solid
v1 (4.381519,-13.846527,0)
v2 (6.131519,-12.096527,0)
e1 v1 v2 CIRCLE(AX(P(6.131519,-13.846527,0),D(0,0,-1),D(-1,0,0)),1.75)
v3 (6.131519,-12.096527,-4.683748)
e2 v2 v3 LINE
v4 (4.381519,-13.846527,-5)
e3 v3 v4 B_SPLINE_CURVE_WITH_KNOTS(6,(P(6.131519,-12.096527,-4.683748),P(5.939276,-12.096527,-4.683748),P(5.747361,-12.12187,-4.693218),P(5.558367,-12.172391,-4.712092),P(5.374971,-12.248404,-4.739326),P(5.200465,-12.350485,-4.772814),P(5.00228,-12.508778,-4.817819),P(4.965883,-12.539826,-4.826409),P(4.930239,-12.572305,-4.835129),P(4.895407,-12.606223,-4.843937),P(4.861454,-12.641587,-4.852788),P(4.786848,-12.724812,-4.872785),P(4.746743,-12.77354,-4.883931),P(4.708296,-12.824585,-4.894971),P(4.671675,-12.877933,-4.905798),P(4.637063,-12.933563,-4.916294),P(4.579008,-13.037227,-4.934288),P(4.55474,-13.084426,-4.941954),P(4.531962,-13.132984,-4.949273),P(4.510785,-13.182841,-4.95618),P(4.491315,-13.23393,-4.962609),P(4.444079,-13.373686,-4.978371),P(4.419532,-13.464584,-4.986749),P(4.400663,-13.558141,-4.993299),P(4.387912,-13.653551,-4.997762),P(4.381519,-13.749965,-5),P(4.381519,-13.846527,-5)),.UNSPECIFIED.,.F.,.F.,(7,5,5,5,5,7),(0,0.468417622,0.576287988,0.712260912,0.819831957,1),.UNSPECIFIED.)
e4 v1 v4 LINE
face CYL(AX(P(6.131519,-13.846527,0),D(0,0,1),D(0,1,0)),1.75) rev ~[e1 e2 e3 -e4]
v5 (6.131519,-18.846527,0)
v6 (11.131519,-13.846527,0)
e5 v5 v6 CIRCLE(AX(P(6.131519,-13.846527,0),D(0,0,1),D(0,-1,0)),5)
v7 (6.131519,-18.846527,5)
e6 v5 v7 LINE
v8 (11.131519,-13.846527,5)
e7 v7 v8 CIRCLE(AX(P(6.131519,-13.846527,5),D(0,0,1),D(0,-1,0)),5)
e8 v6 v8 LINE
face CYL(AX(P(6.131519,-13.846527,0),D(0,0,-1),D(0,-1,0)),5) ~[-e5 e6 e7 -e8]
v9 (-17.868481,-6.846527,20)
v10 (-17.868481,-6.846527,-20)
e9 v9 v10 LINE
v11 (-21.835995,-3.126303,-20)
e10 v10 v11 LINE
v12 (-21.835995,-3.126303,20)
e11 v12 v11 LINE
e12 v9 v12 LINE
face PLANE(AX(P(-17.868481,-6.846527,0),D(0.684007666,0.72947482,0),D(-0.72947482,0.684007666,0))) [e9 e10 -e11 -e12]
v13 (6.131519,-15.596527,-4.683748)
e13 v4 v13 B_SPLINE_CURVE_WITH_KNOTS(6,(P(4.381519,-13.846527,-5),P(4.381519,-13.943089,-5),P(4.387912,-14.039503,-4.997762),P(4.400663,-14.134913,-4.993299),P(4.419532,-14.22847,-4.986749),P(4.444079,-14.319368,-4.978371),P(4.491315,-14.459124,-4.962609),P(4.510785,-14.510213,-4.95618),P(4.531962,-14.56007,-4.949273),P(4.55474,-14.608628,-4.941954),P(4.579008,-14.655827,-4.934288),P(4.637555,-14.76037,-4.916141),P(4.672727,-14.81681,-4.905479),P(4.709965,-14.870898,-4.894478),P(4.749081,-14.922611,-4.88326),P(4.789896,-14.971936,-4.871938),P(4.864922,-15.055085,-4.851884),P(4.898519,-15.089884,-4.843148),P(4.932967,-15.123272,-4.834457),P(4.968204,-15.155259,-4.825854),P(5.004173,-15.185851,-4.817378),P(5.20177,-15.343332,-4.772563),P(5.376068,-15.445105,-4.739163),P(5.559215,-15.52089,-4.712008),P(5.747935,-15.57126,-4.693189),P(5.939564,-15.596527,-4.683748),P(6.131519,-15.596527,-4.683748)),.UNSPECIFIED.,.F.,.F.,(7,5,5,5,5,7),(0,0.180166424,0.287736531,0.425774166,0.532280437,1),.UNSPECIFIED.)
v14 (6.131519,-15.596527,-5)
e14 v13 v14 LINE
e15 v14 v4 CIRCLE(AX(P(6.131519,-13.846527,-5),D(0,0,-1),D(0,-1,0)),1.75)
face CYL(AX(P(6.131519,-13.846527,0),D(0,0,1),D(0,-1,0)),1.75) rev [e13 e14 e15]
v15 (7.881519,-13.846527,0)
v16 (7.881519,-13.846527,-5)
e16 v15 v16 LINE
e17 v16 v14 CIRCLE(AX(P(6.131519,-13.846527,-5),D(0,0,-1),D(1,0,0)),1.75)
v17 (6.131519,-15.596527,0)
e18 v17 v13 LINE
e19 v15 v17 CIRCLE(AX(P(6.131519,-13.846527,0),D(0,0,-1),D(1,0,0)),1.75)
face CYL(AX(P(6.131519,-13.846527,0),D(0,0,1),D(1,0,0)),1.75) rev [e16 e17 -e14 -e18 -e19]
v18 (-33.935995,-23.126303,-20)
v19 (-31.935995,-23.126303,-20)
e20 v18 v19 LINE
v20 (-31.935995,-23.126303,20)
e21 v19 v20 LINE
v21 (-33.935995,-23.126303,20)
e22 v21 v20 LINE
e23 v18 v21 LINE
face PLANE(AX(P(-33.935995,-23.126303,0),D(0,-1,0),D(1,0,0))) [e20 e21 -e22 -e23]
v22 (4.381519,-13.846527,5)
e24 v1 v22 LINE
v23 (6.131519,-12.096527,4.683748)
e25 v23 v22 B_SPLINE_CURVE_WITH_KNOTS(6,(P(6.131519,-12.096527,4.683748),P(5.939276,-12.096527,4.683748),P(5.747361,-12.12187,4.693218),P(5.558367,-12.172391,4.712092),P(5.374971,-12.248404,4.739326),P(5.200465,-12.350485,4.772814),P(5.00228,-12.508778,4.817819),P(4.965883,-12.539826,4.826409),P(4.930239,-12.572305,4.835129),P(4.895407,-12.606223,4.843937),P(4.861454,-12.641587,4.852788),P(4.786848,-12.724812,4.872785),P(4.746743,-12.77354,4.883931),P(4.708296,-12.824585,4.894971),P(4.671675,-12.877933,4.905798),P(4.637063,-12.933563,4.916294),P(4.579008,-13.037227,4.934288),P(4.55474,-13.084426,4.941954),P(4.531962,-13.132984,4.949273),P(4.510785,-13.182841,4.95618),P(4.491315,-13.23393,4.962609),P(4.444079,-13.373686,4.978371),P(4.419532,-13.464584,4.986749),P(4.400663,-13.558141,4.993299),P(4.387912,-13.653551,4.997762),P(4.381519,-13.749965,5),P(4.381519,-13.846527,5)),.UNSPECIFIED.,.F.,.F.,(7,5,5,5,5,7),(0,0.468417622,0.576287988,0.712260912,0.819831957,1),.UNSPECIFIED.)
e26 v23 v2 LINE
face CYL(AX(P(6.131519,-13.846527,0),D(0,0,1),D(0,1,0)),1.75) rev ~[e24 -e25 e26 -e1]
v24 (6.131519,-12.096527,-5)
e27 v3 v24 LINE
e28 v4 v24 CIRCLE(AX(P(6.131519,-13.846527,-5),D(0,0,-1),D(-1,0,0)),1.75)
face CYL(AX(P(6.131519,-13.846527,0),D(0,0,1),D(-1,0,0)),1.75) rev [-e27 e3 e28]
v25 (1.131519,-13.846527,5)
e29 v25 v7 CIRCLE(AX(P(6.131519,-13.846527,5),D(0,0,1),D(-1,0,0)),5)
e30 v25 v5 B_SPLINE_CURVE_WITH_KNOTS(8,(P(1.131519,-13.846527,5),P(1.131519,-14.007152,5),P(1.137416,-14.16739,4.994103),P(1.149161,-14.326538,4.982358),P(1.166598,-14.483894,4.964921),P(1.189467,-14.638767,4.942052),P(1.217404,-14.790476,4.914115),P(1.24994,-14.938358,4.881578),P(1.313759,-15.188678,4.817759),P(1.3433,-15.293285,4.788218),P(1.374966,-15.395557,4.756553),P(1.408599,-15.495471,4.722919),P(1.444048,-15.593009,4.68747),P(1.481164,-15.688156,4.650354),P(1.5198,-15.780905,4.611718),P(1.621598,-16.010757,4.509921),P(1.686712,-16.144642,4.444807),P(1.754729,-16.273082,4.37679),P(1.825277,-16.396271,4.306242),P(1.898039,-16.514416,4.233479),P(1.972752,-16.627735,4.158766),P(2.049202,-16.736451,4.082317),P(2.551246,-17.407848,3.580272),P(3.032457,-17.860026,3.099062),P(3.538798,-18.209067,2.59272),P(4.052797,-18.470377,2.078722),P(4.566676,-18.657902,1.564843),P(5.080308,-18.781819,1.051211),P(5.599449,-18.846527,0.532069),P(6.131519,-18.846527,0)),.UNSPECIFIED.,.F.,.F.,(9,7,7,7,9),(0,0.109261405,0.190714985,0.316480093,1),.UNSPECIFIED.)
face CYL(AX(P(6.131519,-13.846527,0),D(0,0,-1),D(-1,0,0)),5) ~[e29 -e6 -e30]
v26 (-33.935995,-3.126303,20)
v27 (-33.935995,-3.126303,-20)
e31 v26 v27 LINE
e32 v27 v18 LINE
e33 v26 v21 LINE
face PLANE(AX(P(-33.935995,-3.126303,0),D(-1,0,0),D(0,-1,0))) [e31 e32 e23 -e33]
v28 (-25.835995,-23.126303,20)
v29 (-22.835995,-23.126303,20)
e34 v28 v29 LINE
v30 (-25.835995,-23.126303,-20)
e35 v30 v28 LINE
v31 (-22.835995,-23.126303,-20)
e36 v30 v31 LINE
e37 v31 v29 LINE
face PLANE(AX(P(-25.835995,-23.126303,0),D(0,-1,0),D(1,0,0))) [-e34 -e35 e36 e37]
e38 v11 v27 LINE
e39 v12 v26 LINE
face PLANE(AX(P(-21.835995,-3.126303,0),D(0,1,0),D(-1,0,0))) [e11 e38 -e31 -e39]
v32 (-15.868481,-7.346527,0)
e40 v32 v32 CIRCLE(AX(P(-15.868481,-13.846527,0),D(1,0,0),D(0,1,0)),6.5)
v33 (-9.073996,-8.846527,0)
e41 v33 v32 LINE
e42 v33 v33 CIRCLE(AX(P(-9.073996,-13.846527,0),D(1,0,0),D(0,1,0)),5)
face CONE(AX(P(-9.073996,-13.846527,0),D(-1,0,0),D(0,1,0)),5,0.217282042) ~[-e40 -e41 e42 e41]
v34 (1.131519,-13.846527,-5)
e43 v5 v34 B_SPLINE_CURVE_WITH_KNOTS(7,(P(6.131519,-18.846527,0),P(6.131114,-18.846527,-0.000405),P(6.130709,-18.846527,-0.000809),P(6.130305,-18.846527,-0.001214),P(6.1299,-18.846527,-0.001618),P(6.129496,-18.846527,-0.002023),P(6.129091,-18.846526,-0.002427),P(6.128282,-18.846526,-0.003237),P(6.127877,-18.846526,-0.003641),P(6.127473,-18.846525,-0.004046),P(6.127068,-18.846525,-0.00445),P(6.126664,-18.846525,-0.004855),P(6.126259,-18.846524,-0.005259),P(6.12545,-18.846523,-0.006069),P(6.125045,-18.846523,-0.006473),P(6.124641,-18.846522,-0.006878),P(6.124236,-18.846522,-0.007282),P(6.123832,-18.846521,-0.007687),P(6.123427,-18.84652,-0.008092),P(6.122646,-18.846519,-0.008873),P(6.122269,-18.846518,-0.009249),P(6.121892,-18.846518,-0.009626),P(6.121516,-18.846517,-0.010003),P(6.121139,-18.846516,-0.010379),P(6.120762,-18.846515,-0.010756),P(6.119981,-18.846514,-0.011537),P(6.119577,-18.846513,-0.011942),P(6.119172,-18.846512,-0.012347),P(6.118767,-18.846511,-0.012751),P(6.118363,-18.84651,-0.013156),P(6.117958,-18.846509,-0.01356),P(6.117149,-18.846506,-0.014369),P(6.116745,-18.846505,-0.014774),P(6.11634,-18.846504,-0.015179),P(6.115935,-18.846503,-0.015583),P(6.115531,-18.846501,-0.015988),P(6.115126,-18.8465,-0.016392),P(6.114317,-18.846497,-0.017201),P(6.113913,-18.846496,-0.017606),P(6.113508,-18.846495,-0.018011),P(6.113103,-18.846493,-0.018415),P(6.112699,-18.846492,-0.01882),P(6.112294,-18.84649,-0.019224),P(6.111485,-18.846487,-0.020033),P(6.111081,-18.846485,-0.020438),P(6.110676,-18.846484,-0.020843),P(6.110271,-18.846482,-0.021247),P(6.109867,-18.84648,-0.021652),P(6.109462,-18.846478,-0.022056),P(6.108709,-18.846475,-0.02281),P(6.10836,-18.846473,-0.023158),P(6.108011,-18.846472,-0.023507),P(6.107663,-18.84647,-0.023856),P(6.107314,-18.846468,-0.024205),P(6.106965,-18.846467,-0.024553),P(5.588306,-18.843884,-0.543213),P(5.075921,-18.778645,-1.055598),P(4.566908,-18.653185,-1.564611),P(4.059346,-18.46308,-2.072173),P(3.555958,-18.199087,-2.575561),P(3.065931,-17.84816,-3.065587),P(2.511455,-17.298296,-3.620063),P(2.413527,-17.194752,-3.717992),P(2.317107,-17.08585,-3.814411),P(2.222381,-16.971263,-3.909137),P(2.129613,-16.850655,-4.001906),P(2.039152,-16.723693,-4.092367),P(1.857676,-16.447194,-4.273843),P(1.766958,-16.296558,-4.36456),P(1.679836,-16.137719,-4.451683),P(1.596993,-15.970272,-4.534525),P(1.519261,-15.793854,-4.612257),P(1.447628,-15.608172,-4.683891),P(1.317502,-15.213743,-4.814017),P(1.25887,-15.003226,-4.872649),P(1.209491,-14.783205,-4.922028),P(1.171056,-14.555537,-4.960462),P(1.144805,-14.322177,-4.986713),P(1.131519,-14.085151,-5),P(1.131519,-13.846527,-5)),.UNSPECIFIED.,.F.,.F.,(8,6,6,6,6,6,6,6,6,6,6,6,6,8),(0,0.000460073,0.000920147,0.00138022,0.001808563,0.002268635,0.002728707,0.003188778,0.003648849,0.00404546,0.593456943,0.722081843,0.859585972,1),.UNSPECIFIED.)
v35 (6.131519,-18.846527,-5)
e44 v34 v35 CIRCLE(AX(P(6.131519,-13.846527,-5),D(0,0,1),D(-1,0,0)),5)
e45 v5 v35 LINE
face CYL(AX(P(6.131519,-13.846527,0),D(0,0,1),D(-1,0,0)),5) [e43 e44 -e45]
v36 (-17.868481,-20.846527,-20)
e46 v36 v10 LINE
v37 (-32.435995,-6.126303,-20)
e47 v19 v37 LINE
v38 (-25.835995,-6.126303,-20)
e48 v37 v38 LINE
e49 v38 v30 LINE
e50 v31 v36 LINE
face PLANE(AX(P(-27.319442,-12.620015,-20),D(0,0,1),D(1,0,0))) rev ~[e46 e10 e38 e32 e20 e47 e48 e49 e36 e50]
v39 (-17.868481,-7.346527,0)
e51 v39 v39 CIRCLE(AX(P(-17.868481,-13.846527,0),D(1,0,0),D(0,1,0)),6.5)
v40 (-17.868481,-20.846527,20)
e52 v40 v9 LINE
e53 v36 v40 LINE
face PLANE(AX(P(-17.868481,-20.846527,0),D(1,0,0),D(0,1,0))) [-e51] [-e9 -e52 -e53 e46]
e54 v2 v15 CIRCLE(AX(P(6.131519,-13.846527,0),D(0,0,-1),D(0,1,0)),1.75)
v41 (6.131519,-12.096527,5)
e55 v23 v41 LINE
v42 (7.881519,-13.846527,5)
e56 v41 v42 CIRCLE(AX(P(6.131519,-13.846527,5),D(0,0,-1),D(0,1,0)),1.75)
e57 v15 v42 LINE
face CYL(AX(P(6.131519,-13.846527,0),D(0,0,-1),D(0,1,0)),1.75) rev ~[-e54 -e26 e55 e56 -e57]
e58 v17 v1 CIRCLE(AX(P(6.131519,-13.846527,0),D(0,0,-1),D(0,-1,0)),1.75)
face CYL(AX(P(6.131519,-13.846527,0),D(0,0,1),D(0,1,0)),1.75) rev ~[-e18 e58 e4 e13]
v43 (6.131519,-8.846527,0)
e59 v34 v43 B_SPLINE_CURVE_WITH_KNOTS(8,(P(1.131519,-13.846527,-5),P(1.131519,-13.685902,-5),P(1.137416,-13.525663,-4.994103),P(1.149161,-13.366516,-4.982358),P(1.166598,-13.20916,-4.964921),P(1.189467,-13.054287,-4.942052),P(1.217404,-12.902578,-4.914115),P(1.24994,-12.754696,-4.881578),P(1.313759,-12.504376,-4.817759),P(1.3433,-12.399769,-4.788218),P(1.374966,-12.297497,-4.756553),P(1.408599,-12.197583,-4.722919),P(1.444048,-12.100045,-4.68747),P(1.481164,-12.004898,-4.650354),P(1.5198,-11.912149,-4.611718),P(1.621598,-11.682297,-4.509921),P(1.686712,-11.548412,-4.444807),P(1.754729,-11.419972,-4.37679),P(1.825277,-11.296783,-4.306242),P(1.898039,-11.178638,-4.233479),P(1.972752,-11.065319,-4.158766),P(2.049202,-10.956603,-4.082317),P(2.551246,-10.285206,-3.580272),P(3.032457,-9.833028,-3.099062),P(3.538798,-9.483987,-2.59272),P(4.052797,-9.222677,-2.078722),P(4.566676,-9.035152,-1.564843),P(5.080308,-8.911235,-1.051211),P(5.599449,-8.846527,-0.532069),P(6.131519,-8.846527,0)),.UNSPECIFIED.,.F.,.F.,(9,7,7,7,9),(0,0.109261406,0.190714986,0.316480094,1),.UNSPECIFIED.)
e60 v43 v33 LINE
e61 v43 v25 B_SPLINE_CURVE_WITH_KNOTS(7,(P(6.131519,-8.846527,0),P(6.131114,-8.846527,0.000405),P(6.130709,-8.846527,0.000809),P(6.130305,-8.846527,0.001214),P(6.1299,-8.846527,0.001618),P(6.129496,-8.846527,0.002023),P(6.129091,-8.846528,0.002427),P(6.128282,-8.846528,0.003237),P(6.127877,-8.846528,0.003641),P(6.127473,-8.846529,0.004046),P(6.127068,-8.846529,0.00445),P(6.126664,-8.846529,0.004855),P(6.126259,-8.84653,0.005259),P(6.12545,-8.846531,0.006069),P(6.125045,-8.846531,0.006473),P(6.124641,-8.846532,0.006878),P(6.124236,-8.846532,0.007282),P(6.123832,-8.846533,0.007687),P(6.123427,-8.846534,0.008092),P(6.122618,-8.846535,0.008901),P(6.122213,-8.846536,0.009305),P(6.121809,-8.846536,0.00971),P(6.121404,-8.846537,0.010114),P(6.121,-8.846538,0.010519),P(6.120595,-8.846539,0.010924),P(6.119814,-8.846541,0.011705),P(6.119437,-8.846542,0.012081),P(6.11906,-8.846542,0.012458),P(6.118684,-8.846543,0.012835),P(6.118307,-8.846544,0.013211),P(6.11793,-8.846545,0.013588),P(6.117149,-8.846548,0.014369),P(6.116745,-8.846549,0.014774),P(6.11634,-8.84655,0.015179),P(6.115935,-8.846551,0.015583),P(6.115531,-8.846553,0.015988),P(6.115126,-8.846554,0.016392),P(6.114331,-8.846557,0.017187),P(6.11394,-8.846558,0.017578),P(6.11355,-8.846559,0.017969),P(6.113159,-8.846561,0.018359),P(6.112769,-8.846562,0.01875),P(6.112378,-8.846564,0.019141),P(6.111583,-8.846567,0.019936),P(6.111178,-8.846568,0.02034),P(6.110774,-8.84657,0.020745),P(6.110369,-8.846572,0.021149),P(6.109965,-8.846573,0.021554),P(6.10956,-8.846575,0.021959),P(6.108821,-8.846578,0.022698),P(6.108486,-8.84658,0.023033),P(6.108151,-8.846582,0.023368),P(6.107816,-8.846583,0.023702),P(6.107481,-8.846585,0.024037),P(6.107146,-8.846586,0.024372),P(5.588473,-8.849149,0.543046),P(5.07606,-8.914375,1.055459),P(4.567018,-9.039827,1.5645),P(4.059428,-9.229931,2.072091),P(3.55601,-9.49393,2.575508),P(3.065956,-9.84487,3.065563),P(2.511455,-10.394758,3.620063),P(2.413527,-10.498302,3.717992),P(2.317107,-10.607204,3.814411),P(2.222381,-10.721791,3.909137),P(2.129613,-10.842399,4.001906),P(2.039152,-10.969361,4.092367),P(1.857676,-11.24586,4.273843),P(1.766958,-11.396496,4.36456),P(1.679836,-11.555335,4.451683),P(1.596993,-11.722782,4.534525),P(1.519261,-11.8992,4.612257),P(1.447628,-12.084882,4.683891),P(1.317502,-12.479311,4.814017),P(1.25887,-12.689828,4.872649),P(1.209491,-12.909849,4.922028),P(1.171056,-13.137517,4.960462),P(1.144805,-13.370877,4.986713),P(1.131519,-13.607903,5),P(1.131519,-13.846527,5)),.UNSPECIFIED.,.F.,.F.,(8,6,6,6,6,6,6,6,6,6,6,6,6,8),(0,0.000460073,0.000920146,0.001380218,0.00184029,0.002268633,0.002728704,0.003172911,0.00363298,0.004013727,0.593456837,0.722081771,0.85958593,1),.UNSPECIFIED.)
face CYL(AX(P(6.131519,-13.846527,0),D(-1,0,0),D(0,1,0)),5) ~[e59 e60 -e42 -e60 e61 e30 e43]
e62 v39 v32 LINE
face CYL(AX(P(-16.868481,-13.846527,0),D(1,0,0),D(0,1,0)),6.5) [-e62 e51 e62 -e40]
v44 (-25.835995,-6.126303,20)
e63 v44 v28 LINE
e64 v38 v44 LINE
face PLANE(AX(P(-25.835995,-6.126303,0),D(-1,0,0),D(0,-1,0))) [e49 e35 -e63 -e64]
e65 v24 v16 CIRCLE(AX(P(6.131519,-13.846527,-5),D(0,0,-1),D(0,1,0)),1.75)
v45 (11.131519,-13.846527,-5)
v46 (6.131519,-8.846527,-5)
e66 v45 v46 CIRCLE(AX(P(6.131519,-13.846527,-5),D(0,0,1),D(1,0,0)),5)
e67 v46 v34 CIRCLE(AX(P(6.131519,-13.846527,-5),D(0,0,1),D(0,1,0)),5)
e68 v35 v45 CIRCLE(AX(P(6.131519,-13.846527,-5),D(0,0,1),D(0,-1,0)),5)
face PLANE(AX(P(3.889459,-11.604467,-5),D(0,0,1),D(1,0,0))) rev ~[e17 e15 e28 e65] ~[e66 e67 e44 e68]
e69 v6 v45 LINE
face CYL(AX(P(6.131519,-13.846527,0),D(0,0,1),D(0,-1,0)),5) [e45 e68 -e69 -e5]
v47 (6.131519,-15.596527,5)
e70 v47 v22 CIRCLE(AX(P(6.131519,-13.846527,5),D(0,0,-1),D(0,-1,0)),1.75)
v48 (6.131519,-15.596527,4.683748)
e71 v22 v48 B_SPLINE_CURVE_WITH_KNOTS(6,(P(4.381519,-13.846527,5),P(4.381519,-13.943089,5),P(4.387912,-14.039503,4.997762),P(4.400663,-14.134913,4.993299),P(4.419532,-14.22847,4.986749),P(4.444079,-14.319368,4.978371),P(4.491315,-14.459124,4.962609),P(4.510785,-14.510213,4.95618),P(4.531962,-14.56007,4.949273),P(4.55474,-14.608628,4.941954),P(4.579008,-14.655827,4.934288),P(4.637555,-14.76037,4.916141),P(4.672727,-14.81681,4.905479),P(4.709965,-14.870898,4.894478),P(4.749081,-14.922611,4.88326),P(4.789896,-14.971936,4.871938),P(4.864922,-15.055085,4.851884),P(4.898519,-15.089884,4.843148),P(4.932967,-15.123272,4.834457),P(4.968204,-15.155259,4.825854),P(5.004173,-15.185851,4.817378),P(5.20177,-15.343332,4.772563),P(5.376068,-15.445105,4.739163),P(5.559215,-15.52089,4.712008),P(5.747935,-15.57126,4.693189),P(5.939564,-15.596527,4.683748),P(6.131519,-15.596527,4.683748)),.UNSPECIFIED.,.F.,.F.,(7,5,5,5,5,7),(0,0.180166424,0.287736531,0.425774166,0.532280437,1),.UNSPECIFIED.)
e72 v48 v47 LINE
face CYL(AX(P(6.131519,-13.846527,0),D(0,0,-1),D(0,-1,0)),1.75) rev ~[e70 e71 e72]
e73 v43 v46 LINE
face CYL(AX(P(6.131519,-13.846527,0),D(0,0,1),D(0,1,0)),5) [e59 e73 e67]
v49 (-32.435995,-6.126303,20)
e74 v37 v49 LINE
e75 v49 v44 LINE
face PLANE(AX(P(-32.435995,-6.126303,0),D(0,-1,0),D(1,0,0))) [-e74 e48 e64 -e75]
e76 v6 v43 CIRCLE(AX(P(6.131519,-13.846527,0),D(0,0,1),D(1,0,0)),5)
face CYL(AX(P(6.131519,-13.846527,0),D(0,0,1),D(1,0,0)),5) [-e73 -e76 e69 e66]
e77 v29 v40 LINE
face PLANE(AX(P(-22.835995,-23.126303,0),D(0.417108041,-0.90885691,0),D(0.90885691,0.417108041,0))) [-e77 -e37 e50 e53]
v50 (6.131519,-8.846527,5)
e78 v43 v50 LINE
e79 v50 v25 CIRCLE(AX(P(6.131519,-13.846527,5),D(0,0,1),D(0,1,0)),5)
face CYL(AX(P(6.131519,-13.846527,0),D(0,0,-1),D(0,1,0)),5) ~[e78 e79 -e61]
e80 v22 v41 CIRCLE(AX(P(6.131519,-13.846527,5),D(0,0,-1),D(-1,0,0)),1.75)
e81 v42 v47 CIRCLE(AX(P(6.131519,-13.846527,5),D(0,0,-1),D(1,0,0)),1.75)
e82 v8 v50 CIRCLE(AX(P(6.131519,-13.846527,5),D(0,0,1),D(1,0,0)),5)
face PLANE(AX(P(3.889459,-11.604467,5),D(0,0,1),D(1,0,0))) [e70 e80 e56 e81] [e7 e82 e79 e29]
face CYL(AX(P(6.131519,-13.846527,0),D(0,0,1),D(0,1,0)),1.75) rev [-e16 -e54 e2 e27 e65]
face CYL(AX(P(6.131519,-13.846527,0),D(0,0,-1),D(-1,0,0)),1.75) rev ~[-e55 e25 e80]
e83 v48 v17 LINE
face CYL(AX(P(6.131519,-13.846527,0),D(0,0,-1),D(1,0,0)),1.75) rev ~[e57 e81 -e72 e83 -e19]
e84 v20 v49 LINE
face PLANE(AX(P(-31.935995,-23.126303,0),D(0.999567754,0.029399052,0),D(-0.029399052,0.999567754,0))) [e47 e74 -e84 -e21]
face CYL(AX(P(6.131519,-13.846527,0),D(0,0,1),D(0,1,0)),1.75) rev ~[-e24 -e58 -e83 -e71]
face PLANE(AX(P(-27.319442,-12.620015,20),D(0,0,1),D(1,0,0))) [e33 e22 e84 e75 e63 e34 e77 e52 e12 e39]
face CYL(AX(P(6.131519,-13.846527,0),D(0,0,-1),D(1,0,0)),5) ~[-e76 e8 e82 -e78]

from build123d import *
from build123d import SkipClean  # not in build123d's __all__

# Parameters (mm, degrees)
F1_DEPTH = 20
F0_W     = 2
F0_H     = 6.5
F5_DEPTH = 5
F6_DEPTH = 5


with BuildPart() as f1:
    # F0 (on Top) → F1 (new body, symmetric)
    with BuildSketch(Plane.XY):
        Polygon((-33.9359952807, -3.1263027601), (-33.9359952807, -23.1263027601), (-31.9359952807, -23.1263027601), (-32.4359952807, -6.1263027601), (-25.8359952807, -6.1263027601), (-25.8359952807, -23.1263027601), (-22.8359952807, -23.1263027601), (-17.8684814229, -20.8465269788), (-17.8684814229, -20.3465269788), (-17.8684814229, -13.8465269788), (-17.8684814229, -7.3465269788), (-17.8684814229, -6.8465269788), (-21.8359952807, -3.1263027601), align=None)
    extrude(amount=F1_DEPTH, both=True)

    # F0 (on Top) → F2 (revolve)
    with BuildSketch(Plane.XY):
        with Locations((-16.8684814229, -10.5965269788)):
            Rectangle(F0_W, F0_H)
    revolve(axis=Axis((-16.8684814229, -13.8465269788, 0), (1, 0, 0)))

    # F0 (on Top) → F3 (revolve)
    with BuildSketch(Plane.XY):
        Polygon((-9.0739962115, -8.8465269788), (-15.8684814229, -7.3465269788), (-15.8684814229, -13.8465269788), (-9.0739962115, -13.8465269788), align=None)
    revolve(axis=Axis((-4.8684814229, -13.8465269788, 0), (1, 0, 0)))

    # F0 (on Top) → F4 (revolve)
    with BuildSketch(Plane.XY):
        with BuildLine():
            Line((6.1315185771, -8.8465269788), (-9.0739962115, -8.8465269788))
            Line((-9.0739962115, -8.8465269788), (-9.0739962115, -13.8465269788))
            Line((-9.0739962115, -13.8465269788), (1.1315185771, -13.8465269788))
            ThreePointArc((1.1315185771, -13.8465269788), (2.5959846712, -10.3109930728), (6.1315185771, -8.8465269788))
        make_face()
        with BuildLine():
            Line((6.1315185771, -12.0965269788), (6.1315185771, -8.8465269788))
            ThreePointArc((6.1315185771, -8.8465269788), (2.5959846712, -10.3109930728), (1.1315185771, -13.8465269788))
            Line((1.1315185771, -13.8465269788), (4.3815185771, -13.8465269788))
            ThreePointArc((4.3815185771, -13.8465269788), (4.89408171, -12.6090901117), (6.1315185771, -12.0965269788))
        make_face()
        with BuildLine():
            Line((6.1315185771, -13.8465269788), (6.1315185771, -12.0965269788))
            ThreePointArc((6.1315185771, -12.0965269788), (4.89408171, -12.6090901117), (4.3815185771, -13.8465269788))
            Line((4.3815185771, -13.8465269788), (6.1315185771, -13.8465269788))
        make_face()
    revolve(axis=Axis((-4.8684814229, -13.8465269788, 0), (1, 0, 0)))

    # F0 (on Top) → F5 (cut, symmetric)
    with BuildSketch(Plane.XY):
        with BuildLine():
            Line((6.1315185771, -13.8465269788), (4.3815185771, -13.8465269788))
            ThreePointArc((4.3815185771, -13.8465269788), (4.89408171, -15.0839638459), (6.1315185771, -15.5965269788))
            Line((6.1315185771, -15.5965269788), (6.1315185771, -13.8465269788))
        make_face()
        with BuildLine():
            ThreePointArc((7.8815185771, -13.8465269788), (7.3689554442, -12.6090901117), (6.1315185771, -12.0965269788))
            Line((6.1315185771, -12.0965269788), (6.1315185771, -13.8465269788))
            Line((6.1315185771, -13.8465269788), (6.1315185771, -15.5965269788))
            ThreePointArc((6.1315185771, -15.5965269788), (7.3689554442, -15.0839638459), (7.8815185771, -13.8465269788))
        make_face()
        with BuildLine():
            Line((6.1315185771, -13.8465269788), (6.1315185771, -12.0965269788))
            ThreePointArc((6.1315185771, -12.0965269788), (4.89408171, -12.6090901117), (4.3815185771, -13.8465269788))
            Line((4.3815185771, -13.8465269788), (6.1315185771, -13.8465269788))
        make_face()
    extrude(amount=F5_DEPTH, both=True, mode=Mode.SUBTRACT)

    # F0 (on Top) → F6 (join, symmetric)
    with BuildSketch(Plane.XY):
        with BuildLine():
            Line((6.1315185771, -12.0965269788), (6.1315185771, -8.8465269788))
            ThreePointArc((6.1315185771, -8.8465269788), (2.5959846712, -10.3109930728), (1.1315185771, -13.8465269788))
            Line((1.1315185771, -13.8465269788), (4.3815185771, -13.8465269788))
            ThreePointArc((4.3815185771, -13.8465269788), (4.89408171, -12.6090901117), (6.1315185771, -12.0965269788))
        make_face()
        with BuildLine():
            Line((4.3815185771, -13.8465269788), (1.1315185771, -13.8465269788))
            ThreePointArc((1.1315185771, -13.8465269788), (2.5959846712, -17.3820608847), (6.1315185771, -18.8465269788))
            Line((6.1315185771, -18.8465269788), (6.1315185771, -15.5965269788))
            ThreePointArc((6.1315185771, -15.5965269788), (4.89408171, -15.0839638459), (4.3815185771, -13.8465269788))
        make_face()
        with BuildLine():
            ThreePointArc((11.1315185771, -13.8465269788), (9.667052483, -10.3109930728), (6.1315185771, -8.8465269788))
            Line((6.1315185771, -8.8465269788), (6.1315185771, -12.0965269788))
            ThreePointArc((6.1315185771, -12.0965269788), (7.3689554442, -12.6090901117), (7.8815185771, -13.8465269788))
            ThreePointArc((7.8815185771, -13.8465269788), (7.3689554442, -15.0839638459), (6.1315185771, -15.5965269788))
            Line((6.1315185771, -15.5965269788), (6.1315185771, -18.8465269788))
            ThreePointArc((6.1315185771, -18.8465269788), (9.667052483, -17.3820608847), (11.1315185771, -13.8465269788))
        make_face()
    with SkipClean():  # cleaning this boolean's faces spoils the solid; the shape is the same uncleaned
        extrude(amount=F6_DEPTH, both=True)


solid = f1.part
